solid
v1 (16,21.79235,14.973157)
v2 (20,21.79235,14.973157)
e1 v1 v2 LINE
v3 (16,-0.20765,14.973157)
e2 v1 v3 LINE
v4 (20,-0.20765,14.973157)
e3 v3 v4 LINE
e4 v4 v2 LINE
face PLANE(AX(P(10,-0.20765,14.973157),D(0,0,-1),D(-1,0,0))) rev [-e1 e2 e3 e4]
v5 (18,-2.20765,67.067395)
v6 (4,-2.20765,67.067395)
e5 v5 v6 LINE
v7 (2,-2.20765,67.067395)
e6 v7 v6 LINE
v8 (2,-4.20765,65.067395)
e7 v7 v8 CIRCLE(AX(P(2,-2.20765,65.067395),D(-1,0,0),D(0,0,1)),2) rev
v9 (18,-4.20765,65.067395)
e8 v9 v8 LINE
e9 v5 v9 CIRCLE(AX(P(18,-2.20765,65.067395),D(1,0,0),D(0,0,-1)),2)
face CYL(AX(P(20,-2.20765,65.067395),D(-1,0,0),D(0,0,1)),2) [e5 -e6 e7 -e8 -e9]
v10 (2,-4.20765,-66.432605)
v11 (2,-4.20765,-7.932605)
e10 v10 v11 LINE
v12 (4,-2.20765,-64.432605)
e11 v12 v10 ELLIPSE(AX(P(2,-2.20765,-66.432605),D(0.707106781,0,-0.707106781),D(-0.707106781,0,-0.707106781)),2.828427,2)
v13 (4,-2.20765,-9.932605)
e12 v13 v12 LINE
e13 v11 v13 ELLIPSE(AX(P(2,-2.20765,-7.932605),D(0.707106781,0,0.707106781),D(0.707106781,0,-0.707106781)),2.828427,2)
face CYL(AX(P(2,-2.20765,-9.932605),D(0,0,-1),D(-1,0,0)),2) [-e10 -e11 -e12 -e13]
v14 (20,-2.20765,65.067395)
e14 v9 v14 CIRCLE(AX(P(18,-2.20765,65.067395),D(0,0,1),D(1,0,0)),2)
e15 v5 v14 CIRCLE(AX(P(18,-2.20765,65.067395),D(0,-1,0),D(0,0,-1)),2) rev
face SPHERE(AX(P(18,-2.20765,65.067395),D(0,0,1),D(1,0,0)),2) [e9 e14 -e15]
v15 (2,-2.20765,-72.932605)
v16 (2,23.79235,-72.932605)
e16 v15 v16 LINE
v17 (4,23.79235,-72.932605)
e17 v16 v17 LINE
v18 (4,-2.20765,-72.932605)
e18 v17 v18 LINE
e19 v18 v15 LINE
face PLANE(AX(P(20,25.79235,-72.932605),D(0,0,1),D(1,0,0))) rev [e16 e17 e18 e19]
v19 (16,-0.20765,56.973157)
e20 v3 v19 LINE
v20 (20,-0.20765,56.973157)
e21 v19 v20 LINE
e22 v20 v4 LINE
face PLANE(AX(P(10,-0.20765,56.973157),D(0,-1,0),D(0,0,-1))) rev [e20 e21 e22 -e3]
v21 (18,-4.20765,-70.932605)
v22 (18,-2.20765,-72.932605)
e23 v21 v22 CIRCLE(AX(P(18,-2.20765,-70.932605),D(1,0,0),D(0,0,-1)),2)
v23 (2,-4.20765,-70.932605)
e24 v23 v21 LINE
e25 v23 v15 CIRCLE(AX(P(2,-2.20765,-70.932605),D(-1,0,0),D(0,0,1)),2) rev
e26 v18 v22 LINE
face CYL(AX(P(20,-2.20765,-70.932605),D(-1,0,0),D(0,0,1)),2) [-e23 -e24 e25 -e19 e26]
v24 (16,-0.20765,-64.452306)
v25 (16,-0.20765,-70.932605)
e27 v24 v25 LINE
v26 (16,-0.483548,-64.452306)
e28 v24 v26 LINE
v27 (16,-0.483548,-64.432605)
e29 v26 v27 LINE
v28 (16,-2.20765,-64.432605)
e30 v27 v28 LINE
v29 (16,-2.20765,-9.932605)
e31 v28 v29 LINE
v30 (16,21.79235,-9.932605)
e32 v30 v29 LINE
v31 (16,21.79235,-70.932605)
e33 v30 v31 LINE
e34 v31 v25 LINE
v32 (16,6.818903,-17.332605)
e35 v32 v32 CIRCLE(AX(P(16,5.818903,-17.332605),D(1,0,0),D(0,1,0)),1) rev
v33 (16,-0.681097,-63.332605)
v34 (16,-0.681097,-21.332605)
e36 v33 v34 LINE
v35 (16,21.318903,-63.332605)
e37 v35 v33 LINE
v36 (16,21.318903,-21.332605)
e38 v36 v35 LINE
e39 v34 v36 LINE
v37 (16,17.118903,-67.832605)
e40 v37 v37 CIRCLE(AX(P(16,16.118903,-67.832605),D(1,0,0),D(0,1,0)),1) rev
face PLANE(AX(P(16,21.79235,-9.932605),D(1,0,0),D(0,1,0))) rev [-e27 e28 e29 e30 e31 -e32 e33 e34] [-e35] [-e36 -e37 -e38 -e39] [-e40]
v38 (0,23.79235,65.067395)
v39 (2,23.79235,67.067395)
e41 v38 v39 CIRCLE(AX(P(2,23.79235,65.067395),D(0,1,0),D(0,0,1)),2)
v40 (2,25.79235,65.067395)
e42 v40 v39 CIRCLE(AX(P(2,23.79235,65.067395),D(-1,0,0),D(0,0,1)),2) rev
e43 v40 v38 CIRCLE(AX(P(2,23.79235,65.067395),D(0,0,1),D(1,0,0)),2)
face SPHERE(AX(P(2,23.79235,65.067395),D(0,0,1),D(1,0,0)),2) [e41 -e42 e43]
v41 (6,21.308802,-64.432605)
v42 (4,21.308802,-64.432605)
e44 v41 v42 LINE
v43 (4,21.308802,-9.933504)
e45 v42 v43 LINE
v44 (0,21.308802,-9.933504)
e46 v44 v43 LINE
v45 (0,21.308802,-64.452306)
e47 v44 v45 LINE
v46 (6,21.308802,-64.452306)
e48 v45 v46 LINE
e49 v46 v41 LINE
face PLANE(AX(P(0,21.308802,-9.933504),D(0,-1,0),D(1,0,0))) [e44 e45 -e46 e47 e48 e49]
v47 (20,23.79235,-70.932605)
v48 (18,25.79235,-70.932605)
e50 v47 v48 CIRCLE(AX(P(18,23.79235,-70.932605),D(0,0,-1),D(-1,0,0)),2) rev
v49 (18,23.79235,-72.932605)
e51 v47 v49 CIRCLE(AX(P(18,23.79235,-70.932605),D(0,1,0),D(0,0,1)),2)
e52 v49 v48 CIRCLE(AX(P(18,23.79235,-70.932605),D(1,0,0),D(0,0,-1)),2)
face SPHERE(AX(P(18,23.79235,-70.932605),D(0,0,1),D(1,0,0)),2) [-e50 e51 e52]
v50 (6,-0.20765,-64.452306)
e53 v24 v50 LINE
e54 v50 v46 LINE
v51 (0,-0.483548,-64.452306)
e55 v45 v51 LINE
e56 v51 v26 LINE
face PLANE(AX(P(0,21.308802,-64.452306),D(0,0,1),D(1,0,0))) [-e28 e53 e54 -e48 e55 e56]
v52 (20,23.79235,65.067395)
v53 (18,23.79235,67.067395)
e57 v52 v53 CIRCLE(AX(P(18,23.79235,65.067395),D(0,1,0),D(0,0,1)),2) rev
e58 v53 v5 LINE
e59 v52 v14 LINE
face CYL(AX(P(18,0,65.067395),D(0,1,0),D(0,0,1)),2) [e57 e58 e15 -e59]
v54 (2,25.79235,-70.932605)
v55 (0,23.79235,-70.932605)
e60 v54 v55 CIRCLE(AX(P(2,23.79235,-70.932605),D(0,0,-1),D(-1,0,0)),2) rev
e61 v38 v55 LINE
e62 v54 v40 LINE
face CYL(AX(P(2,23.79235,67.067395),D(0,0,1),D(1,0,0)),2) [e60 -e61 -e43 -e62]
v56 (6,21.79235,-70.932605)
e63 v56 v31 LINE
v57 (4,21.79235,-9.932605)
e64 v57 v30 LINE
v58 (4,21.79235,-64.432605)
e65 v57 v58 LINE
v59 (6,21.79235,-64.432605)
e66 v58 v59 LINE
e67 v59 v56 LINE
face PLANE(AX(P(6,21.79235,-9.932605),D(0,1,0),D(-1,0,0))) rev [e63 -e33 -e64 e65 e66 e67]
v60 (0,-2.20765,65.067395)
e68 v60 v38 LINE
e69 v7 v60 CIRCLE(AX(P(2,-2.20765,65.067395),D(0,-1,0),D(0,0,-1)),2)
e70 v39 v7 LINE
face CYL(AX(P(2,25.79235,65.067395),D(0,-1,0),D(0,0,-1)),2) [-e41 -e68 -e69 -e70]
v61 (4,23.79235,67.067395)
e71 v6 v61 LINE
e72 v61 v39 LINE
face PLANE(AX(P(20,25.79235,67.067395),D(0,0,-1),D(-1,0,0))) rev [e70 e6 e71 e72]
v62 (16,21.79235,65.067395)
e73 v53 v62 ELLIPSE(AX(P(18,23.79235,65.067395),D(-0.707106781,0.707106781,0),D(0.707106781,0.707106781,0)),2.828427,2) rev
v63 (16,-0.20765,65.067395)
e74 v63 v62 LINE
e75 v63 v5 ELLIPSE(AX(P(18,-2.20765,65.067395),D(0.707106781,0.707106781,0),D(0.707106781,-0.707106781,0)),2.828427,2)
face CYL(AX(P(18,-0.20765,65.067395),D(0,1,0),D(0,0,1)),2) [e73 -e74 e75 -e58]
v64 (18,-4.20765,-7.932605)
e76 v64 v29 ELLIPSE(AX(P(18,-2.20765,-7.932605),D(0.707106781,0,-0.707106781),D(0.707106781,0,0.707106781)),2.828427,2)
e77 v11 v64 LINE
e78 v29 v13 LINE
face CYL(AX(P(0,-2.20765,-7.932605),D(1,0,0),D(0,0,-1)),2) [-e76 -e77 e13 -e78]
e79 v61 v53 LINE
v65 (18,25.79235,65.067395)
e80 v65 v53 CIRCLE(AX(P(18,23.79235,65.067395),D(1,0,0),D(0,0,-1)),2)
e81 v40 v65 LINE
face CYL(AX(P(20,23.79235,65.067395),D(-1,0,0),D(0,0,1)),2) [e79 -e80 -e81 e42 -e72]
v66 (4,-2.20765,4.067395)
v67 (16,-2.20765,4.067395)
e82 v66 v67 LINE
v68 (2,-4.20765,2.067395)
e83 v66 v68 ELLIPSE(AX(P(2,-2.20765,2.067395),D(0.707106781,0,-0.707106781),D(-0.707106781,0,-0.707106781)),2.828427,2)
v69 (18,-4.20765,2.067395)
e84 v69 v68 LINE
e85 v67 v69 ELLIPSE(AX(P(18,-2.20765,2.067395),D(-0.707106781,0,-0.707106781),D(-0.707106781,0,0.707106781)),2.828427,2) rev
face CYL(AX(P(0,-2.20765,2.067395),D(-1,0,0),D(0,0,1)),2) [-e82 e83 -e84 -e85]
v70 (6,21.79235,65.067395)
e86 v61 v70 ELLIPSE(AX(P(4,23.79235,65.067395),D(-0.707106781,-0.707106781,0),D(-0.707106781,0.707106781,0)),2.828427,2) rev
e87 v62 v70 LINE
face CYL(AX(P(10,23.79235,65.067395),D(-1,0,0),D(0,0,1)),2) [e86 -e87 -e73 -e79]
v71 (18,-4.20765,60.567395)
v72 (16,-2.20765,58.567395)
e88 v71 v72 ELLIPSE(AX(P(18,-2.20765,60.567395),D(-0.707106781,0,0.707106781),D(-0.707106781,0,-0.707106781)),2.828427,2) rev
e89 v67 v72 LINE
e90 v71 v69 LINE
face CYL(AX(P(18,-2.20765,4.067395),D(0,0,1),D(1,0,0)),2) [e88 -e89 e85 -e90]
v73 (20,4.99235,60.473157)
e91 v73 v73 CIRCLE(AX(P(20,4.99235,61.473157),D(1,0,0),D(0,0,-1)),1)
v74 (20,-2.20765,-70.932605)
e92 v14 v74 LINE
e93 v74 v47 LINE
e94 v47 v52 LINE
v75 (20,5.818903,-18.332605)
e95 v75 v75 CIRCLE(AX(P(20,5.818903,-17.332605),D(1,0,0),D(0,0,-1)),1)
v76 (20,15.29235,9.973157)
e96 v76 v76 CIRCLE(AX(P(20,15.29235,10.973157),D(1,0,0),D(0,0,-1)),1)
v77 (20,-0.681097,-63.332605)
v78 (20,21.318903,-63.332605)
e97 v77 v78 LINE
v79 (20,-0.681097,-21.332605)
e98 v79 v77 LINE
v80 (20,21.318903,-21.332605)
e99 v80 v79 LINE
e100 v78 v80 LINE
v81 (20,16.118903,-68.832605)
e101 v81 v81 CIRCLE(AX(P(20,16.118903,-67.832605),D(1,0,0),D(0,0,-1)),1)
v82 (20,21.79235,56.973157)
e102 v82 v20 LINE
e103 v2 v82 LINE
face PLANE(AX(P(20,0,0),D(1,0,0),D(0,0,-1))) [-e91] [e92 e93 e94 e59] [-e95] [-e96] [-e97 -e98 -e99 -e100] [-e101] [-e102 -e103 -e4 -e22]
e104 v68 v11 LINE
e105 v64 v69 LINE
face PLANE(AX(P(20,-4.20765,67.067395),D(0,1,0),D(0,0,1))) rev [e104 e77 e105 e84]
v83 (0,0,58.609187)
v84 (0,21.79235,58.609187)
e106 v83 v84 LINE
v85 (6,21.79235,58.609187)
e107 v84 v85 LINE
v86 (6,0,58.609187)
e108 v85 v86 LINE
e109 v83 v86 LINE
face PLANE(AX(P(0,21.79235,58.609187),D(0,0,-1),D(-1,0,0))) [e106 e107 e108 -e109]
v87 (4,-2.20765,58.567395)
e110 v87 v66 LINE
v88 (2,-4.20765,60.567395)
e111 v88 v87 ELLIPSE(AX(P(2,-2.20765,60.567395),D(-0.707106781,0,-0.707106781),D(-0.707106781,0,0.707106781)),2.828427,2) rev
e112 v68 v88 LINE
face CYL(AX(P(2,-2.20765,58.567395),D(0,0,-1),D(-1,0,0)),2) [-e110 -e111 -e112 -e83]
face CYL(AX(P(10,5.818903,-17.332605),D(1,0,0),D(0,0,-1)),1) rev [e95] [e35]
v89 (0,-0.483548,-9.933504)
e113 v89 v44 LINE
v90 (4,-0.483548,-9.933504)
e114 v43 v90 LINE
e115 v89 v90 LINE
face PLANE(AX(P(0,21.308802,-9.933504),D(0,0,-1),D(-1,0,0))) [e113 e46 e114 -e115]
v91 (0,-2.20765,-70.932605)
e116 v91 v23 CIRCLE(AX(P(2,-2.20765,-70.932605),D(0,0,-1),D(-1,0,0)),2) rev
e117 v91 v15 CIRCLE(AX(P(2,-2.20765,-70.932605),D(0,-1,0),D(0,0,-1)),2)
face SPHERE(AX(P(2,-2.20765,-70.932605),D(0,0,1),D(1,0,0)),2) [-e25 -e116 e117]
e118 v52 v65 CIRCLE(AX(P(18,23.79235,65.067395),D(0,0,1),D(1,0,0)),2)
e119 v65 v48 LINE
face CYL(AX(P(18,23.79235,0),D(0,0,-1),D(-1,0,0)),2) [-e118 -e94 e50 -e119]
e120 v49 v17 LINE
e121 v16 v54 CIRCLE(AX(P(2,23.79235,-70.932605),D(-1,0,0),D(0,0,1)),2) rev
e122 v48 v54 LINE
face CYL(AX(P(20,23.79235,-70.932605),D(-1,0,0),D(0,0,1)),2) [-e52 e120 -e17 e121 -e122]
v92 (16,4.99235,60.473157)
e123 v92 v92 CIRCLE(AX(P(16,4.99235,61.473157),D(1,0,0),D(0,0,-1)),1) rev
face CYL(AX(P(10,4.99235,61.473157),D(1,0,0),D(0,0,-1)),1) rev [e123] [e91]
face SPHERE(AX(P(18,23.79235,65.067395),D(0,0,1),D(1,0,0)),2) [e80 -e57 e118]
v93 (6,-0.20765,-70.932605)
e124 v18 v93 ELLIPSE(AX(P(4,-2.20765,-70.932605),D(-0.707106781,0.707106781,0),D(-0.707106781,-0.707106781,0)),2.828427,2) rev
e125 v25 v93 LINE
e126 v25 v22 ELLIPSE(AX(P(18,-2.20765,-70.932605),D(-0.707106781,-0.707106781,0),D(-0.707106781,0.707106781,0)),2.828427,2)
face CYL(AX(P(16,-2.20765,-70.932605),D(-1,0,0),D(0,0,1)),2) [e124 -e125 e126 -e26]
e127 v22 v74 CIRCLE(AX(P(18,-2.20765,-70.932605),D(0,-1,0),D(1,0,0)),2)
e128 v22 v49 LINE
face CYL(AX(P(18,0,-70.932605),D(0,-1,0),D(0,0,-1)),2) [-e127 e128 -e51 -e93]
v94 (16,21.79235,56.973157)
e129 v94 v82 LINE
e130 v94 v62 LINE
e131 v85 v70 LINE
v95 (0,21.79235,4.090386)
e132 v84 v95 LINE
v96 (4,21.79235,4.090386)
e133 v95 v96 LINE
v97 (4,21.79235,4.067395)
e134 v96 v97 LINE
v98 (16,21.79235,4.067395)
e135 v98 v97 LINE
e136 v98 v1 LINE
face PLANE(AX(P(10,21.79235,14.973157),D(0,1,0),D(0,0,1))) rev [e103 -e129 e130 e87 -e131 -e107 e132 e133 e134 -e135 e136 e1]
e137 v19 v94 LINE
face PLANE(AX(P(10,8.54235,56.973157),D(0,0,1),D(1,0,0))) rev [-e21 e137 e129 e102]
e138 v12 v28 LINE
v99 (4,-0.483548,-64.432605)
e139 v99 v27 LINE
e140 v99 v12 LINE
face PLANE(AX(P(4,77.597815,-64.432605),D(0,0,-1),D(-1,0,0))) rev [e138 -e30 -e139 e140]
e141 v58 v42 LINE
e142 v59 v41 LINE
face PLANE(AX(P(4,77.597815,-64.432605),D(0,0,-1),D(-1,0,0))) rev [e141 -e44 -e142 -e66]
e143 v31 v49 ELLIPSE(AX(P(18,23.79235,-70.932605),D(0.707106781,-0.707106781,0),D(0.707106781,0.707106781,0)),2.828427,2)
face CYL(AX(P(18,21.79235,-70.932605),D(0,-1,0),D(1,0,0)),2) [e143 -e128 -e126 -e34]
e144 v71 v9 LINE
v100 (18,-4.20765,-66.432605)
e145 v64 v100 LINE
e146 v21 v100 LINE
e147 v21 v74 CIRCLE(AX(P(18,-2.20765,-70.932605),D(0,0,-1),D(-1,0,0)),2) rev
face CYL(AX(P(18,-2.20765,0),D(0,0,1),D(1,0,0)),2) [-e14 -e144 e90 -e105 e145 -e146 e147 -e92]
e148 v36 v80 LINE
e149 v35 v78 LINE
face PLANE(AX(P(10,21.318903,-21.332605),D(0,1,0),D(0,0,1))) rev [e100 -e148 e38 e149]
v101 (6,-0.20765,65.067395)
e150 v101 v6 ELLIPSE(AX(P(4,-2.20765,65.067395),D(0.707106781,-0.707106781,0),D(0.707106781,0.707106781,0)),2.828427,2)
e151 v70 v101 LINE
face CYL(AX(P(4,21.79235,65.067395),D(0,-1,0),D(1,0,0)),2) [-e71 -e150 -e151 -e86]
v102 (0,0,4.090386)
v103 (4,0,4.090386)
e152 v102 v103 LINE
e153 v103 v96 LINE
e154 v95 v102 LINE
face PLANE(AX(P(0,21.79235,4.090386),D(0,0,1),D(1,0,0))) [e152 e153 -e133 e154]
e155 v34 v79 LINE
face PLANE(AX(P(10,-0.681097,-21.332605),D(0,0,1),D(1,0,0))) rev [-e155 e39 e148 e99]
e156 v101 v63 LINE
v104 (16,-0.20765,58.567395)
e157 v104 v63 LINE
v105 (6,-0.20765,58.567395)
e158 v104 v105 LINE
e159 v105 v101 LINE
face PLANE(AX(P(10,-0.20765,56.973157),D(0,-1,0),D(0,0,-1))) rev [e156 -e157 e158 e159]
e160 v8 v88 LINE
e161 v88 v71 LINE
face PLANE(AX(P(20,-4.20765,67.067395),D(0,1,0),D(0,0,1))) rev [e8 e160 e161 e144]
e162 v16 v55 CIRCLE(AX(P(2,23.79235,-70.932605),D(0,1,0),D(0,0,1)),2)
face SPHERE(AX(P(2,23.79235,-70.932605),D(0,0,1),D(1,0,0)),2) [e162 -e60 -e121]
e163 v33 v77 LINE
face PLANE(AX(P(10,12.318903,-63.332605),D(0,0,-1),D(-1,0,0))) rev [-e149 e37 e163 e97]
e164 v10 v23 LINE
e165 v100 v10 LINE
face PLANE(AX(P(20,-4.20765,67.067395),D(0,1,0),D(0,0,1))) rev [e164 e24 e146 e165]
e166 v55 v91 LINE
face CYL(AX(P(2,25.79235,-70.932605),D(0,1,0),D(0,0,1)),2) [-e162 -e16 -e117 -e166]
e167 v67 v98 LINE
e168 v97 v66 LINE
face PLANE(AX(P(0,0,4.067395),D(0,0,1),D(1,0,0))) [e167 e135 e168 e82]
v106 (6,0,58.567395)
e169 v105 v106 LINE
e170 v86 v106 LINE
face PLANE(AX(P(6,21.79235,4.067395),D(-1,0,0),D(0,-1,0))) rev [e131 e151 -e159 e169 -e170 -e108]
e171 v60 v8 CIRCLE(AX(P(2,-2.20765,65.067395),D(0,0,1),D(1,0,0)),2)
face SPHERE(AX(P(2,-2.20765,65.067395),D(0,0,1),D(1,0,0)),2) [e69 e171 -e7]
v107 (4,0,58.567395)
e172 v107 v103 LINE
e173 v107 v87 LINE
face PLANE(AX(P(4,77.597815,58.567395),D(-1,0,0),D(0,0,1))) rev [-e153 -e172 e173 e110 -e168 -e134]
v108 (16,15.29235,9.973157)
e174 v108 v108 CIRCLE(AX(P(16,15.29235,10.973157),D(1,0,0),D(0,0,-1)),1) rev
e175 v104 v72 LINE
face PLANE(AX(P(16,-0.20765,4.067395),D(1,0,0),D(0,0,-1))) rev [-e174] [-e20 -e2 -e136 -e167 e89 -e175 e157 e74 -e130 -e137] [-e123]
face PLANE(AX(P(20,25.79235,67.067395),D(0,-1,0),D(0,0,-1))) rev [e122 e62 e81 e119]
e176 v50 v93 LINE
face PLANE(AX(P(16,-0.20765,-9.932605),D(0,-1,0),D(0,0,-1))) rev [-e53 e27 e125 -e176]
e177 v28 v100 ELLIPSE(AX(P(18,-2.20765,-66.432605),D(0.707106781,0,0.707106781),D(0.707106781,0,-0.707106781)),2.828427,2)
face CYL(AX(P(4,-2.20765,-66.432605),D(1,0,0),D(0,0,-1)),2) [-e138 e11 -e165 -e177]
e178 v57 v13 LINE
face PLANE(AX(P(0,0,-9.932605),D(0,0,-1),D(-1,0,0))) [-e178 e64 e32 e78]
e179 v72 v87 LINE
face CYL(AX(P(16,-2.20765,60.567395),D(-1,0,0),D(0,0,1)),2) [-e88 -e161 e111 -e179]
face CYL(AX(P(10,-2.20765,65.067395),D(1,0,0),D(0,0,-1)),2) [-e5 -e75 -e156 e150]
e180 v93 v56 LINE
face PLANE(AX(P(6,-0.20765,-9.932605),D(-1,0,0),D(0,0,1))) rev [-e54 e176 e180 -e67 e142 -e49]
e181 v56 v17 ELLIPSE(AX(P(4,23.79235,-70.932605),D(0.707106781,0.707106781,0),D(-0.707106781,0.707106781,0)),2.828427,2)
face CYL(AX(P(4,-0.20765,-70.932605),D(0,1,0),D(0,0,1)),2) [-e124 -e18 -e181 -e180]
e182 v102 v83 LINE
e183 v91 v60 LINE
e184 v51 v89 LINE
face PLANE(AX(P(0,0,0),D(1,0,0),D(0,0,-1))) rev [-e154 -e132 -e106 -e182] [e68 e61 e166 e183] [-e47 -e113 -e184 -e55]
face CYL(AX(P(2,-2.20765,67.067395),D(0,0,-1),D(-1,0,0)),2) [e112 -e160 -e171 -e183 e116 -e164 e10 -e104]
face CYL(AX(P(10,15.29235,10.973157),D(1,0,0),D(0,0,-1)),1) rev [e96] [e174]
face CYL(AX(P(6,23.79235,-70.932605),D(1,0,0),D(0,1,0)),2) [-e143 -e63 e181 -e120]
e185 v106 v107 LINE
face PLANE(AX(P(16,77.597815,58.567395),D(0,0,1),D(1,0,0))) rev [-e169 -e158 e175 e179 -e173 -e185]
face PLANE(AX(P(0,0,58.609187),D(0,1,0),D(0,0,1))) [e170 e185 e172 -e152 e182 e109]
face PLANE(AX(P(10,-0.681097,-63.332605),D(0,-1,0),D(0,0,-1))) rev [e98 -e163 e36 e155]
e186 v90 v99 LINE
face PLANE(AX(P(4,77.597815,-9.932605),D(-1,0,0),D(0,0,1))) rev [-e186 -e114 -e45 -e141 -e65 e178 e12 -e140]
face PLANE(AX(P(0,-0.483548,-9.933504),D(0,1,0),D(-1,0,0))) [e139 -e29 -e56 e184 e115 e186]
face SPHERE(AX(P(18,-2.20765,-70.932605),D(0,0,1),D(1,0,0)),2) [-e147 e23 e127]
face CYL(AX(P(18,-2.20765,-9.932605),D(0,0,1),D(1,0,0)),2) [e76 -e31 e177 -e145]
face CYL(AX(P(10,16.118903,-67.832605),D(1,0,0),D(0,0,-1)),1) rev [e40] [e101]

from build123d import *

# Parameters (mm, degrees)
ESQUISSE1_W             = 140
ESQUISSE1_H             = 30
BOSS_EXTRU_1_DEPTH      = 20
ESQUISSE2_R             = 1
ENL_V_MAT_EXTRU_1_DEPTH = 10
ESQUISSE4_R             = 1
ENL_V_MAT_EXTRU_2_DEPTH = 10
ESQUISSE5_W             = 10
ESQUISSE5_H             = 22
ENL_V_MAT_EXTRU_3_DEPTH = 63
ESQUISSE6_W             = 10
ESQUISSE6_H             = 22
ENL_V_MAT_EXTRU_4_DEPTH = 63
ENL_V_MAT_EXTRU_5_REACH = 83.358
ESQUISSE7_W             = 12
ESQUISSE7_H             = 54.5
ENL_V_MAT_EXTRU_6_REACH = 83.358
ESQUISSE8_W             = 12
ESQUISSE8_H             = 54.5
CONG_1_R                = 2
ESQUISSE9_W             = 54.518801533
ESQUISSE9_H             = 21.792349727
ENL_V_MAT_EXTRU_7_DEPTH = 79.996266608
ESQUISSE11_W            = 54.518801533
ESQUISSE11_H            = 21.792349727
ENL_V_MAT_EXTRU_8_DEPTH = 79.996266608


with BuildPart() as part:
    # Esquisse1 → Boss.-Extru.1 (new body)
    with BuildSketch(Plane(origin=(0, 0, 0), x_dir=(0, 0, -1), z_dir=(1, 0, 0))):
        with Locations((2.932604736, 10.792349727)):
            Rectangle(ESQUISSE1_W, ESQUISSE1_H)
    extrude(amount=BOSS_EXTRU_1_DEPTH)

    # Esquisse2 → Enlèv. mat.-Extru.1 (cut)
    with BuildSketch(Plane(origin=(20, 0, 0), x_dir=(0, 0, -1), z_dir=(1, 0, 0))):
        with Locations((67.832604736, 16.118903051)):
            Circle(ESQUISSE2_R)
        with Locations((17.332604736, 5.818903051)):
            Circle(ESQUISSE2_R)
        Polygon((63.332604736, -0.681096949), (21.332604736, -0.681096949), (21.332604736, 21.318903051), (63.332604736, 21.318903051), (63.332604736, 12.318903051), (63.332604736, 8.068903051), align=None)
    extrude(amount=-ENL_V_MAT_EXTRU_1_DEPTH, mode=Mode.SUBTRACT)

    # Esquisse4 → Enlèv. mat.-Extru.2 (cut)
    with BuildSketch(Plane(origin=(20, 26.612998823, 128.329870586), x_dir=(0, 0, 1), z_dir=(1, 0, 0))):
        with Locations(Location((-117.356713594, 11.320649096, 0), (0, 0, 180))):
            Circle(ESQUISSE4_R)
        with Locations(Location((-66.856713594, 21.620649096, 0), (0, 0, 180))):
            Circle(ESQUISSE4_R)
        Polygon((-113.356713594, 26.820649096), (-113.356713594, 4.820649096), (-71.356713594, 4.820649096), (-71.356713594, 13.570649096), (-71.356713594, 18.070649096), (-71.356713594, 26.820649096), align=None)
    extrude(amount=-ENL_V_MAT_EXTRU_2_DEPTH, mode=Mode.SUBTRACT)

    # Esquisse5 → Enlèv. mat.-Extru.3 (cut)
    with BuildSketch(Plane.XY.offset(67.067395264)):
        with Locations((11, 10.792349727)):
            Rectangle(ESQUISSE5_W, ESQUISSE5_H)
    extrude(amount=-ENL_V_MAT_EXTRU_3_DEPTH, mode=Mode.SUBTRACT)

    # Esquisse6 → Enlèv. mat.-Extru.4 (cut)
    with BuildSketch(Plane(origin=(0, 0, -72.932604736), x_dir=(-1, 0, 0), z_dir=(0, 0, -1))):
        with Locations((-11, 10.792349727)):
            Rectangle(ESQUISSE6_W, ESQUISSE6_H)
    extrude(amount=-ENL_V_MAT_EXTRU_4_DEPTH, mode=Mode.SUBTRACT)

    # Enlèv. mat.-Extru.5: up to this face of the body (flat: up to its plane)
    enl_v_mat_extru_5_end = Plane(part.part.faces().sort_by_distance((11, 21.792349727, -41.432604736))[0])
    # Esquisse7 → Enlèv. mat.-Extru.5 (cut, up to the picked face)
    with BuildSketch(Plane.XZ.offset(4.207650273), mode=Mode.PRIVATE) as enl_v_mat_extru_5_sk1:
        with Locations((10, -37.182604736)):
            Rectangle(ESQUISSE7_W, ESQUISSE7_H)
    enl_v_mat_extru_5_tool1 = split(extrude(enl_v_mat_extru_5_sk1.sketch, amount=-ENL_V_MAT_EXTRU_5_REACH, mode=Mode.PRIVATE), bisect_by=enl_v_mat_extru_5_end, keep=Keep.BOTH, mode=Mode.PRIVATE)
    add(enl_v_mat_extru_5_tool1.solids().sort_by(Axis((10, -4.20765, -37.182605), (0, 1, 0)))[0], mode=Mode.SUBTRACT)

    # Enlèv. mat.-Extru.6: up to this face of the body (flat: up to its plane)
    enl_v_mat_extru_6_end = Plane(part.part.faces().sort_by_distance((12.473684211, 21.792349727, 35.652818786))[0])
    # Esquisse8 → Enlèv. mat.-Extru.6 (cut, up to the picked face)
    with BuildSketch(Plane(origin=(0, -4.207650273, 0), x_dir=(-1, 0, 0), z_dir=(0, -1, 0)), mode=Mode.PRIVATE) as enl_v_mat_extru_6_sk1:
        with Locations((-10, -31.317395264)):
            Rectangle(ESQUISSE8_W, ESQUISSE8_H)
    enl_v_mat_extru_6_tool1 = split(extrude(enl_v_mat_extru_6_sk1.sketch, amount=-ENL_V_MAT_EXTRU_6_REACH, mode=Mode.PRIVATE), bisect_by=enl_v_mat_extru_6_end, keep=Keep.BOTH, mode=Mode.PRIVATE)
    add(enl_v_mat_extru_6_tool1.solids().sort_by(Axis((10, -4.20765, 31.317395), (0, 1, 0)))[0], mode=Mode.SUBTRACT)

    # Congé1
    cong_1_edges = [part.edges().sort_by_distance(p)[0] for p in [
        (4, -4.207650273, -37.182604736),
        (10, -4.207650273, -64.432604736),
        (16, -4.207650273, -37.182604736),
        (10, -4.207650273, -9.932604736),
        (20, 10.792349727, -72.932604736),
        (4, -4.207650273, 31.317395264),
        (10, -4.207650273, 4.067395264),
        (16, -4.207650273, 31.317395264),
        (10, -4.207650273, 58.567395264),
        (20, 25.792349727, -2.932604736),
        (20, 10.792349727, 67.067395264),
        (0, 25.792349727, -2.932604736),
        (0, 10.792349727, -72.932604736),
        (0, -4.207650273, -2.932604736),
        (0, 10.792349727, 67.067395264),
        (11, 21.792349727, 67.067395264),
        (6, 10.792349727, 67.067395264),
        (11, -0.207650273, 67.067395264),
        (16, 10.792349727, 67.067395264),
        (10, 25.792349727, 67.067395264),
        (10, 25.792349727, -72.932604736),
        (10, -4.207650273, -72.932604736),
        (10, -4.207650273, 67.067395264),
        (20, -4.207650273, -2.932604736),
        (11, 21.792349727, -72.932604736),
        (16, 10.792349727, -72.932604736),
        (11, -0.207650273, -72.932604736),
        (6, 10.792349727, -72.932604736),
    ]]
    fillet(cong_1_edges, radius=CONG_1_R - 0.0001)  # a hair under: the kernel refuses the full size

    # Esquisse9 → Enlèv. mat.-Extru.7 (cut, through all)
    with BuildSketch(Plane.ZY.offset(-16)):
        with Locations((31.349786376, 10.896174864)):
            Rectangle(ESQUISSE9_W, ESQUISSE9_H)
    extrude(amount=ENL_V_MAT_EXTRU_7_DEPTH, mode=Mode.SUBTRACT)

    # Esquisse11 → Enlèv. mat.-Extru.8 (cut, through all)
    with BuildSketch(Plane.ZY.offset(-16)):
        with Locations((-37.192905042, 10.412626725)):
            Rectangle(ESQUISSE11_W, ESQUISSE11_H)
    extrude(amount=ENL_V_MAT_EXTRU_8_DEPTH, mode=Mode.SUBTRACT)


solid = part.part
